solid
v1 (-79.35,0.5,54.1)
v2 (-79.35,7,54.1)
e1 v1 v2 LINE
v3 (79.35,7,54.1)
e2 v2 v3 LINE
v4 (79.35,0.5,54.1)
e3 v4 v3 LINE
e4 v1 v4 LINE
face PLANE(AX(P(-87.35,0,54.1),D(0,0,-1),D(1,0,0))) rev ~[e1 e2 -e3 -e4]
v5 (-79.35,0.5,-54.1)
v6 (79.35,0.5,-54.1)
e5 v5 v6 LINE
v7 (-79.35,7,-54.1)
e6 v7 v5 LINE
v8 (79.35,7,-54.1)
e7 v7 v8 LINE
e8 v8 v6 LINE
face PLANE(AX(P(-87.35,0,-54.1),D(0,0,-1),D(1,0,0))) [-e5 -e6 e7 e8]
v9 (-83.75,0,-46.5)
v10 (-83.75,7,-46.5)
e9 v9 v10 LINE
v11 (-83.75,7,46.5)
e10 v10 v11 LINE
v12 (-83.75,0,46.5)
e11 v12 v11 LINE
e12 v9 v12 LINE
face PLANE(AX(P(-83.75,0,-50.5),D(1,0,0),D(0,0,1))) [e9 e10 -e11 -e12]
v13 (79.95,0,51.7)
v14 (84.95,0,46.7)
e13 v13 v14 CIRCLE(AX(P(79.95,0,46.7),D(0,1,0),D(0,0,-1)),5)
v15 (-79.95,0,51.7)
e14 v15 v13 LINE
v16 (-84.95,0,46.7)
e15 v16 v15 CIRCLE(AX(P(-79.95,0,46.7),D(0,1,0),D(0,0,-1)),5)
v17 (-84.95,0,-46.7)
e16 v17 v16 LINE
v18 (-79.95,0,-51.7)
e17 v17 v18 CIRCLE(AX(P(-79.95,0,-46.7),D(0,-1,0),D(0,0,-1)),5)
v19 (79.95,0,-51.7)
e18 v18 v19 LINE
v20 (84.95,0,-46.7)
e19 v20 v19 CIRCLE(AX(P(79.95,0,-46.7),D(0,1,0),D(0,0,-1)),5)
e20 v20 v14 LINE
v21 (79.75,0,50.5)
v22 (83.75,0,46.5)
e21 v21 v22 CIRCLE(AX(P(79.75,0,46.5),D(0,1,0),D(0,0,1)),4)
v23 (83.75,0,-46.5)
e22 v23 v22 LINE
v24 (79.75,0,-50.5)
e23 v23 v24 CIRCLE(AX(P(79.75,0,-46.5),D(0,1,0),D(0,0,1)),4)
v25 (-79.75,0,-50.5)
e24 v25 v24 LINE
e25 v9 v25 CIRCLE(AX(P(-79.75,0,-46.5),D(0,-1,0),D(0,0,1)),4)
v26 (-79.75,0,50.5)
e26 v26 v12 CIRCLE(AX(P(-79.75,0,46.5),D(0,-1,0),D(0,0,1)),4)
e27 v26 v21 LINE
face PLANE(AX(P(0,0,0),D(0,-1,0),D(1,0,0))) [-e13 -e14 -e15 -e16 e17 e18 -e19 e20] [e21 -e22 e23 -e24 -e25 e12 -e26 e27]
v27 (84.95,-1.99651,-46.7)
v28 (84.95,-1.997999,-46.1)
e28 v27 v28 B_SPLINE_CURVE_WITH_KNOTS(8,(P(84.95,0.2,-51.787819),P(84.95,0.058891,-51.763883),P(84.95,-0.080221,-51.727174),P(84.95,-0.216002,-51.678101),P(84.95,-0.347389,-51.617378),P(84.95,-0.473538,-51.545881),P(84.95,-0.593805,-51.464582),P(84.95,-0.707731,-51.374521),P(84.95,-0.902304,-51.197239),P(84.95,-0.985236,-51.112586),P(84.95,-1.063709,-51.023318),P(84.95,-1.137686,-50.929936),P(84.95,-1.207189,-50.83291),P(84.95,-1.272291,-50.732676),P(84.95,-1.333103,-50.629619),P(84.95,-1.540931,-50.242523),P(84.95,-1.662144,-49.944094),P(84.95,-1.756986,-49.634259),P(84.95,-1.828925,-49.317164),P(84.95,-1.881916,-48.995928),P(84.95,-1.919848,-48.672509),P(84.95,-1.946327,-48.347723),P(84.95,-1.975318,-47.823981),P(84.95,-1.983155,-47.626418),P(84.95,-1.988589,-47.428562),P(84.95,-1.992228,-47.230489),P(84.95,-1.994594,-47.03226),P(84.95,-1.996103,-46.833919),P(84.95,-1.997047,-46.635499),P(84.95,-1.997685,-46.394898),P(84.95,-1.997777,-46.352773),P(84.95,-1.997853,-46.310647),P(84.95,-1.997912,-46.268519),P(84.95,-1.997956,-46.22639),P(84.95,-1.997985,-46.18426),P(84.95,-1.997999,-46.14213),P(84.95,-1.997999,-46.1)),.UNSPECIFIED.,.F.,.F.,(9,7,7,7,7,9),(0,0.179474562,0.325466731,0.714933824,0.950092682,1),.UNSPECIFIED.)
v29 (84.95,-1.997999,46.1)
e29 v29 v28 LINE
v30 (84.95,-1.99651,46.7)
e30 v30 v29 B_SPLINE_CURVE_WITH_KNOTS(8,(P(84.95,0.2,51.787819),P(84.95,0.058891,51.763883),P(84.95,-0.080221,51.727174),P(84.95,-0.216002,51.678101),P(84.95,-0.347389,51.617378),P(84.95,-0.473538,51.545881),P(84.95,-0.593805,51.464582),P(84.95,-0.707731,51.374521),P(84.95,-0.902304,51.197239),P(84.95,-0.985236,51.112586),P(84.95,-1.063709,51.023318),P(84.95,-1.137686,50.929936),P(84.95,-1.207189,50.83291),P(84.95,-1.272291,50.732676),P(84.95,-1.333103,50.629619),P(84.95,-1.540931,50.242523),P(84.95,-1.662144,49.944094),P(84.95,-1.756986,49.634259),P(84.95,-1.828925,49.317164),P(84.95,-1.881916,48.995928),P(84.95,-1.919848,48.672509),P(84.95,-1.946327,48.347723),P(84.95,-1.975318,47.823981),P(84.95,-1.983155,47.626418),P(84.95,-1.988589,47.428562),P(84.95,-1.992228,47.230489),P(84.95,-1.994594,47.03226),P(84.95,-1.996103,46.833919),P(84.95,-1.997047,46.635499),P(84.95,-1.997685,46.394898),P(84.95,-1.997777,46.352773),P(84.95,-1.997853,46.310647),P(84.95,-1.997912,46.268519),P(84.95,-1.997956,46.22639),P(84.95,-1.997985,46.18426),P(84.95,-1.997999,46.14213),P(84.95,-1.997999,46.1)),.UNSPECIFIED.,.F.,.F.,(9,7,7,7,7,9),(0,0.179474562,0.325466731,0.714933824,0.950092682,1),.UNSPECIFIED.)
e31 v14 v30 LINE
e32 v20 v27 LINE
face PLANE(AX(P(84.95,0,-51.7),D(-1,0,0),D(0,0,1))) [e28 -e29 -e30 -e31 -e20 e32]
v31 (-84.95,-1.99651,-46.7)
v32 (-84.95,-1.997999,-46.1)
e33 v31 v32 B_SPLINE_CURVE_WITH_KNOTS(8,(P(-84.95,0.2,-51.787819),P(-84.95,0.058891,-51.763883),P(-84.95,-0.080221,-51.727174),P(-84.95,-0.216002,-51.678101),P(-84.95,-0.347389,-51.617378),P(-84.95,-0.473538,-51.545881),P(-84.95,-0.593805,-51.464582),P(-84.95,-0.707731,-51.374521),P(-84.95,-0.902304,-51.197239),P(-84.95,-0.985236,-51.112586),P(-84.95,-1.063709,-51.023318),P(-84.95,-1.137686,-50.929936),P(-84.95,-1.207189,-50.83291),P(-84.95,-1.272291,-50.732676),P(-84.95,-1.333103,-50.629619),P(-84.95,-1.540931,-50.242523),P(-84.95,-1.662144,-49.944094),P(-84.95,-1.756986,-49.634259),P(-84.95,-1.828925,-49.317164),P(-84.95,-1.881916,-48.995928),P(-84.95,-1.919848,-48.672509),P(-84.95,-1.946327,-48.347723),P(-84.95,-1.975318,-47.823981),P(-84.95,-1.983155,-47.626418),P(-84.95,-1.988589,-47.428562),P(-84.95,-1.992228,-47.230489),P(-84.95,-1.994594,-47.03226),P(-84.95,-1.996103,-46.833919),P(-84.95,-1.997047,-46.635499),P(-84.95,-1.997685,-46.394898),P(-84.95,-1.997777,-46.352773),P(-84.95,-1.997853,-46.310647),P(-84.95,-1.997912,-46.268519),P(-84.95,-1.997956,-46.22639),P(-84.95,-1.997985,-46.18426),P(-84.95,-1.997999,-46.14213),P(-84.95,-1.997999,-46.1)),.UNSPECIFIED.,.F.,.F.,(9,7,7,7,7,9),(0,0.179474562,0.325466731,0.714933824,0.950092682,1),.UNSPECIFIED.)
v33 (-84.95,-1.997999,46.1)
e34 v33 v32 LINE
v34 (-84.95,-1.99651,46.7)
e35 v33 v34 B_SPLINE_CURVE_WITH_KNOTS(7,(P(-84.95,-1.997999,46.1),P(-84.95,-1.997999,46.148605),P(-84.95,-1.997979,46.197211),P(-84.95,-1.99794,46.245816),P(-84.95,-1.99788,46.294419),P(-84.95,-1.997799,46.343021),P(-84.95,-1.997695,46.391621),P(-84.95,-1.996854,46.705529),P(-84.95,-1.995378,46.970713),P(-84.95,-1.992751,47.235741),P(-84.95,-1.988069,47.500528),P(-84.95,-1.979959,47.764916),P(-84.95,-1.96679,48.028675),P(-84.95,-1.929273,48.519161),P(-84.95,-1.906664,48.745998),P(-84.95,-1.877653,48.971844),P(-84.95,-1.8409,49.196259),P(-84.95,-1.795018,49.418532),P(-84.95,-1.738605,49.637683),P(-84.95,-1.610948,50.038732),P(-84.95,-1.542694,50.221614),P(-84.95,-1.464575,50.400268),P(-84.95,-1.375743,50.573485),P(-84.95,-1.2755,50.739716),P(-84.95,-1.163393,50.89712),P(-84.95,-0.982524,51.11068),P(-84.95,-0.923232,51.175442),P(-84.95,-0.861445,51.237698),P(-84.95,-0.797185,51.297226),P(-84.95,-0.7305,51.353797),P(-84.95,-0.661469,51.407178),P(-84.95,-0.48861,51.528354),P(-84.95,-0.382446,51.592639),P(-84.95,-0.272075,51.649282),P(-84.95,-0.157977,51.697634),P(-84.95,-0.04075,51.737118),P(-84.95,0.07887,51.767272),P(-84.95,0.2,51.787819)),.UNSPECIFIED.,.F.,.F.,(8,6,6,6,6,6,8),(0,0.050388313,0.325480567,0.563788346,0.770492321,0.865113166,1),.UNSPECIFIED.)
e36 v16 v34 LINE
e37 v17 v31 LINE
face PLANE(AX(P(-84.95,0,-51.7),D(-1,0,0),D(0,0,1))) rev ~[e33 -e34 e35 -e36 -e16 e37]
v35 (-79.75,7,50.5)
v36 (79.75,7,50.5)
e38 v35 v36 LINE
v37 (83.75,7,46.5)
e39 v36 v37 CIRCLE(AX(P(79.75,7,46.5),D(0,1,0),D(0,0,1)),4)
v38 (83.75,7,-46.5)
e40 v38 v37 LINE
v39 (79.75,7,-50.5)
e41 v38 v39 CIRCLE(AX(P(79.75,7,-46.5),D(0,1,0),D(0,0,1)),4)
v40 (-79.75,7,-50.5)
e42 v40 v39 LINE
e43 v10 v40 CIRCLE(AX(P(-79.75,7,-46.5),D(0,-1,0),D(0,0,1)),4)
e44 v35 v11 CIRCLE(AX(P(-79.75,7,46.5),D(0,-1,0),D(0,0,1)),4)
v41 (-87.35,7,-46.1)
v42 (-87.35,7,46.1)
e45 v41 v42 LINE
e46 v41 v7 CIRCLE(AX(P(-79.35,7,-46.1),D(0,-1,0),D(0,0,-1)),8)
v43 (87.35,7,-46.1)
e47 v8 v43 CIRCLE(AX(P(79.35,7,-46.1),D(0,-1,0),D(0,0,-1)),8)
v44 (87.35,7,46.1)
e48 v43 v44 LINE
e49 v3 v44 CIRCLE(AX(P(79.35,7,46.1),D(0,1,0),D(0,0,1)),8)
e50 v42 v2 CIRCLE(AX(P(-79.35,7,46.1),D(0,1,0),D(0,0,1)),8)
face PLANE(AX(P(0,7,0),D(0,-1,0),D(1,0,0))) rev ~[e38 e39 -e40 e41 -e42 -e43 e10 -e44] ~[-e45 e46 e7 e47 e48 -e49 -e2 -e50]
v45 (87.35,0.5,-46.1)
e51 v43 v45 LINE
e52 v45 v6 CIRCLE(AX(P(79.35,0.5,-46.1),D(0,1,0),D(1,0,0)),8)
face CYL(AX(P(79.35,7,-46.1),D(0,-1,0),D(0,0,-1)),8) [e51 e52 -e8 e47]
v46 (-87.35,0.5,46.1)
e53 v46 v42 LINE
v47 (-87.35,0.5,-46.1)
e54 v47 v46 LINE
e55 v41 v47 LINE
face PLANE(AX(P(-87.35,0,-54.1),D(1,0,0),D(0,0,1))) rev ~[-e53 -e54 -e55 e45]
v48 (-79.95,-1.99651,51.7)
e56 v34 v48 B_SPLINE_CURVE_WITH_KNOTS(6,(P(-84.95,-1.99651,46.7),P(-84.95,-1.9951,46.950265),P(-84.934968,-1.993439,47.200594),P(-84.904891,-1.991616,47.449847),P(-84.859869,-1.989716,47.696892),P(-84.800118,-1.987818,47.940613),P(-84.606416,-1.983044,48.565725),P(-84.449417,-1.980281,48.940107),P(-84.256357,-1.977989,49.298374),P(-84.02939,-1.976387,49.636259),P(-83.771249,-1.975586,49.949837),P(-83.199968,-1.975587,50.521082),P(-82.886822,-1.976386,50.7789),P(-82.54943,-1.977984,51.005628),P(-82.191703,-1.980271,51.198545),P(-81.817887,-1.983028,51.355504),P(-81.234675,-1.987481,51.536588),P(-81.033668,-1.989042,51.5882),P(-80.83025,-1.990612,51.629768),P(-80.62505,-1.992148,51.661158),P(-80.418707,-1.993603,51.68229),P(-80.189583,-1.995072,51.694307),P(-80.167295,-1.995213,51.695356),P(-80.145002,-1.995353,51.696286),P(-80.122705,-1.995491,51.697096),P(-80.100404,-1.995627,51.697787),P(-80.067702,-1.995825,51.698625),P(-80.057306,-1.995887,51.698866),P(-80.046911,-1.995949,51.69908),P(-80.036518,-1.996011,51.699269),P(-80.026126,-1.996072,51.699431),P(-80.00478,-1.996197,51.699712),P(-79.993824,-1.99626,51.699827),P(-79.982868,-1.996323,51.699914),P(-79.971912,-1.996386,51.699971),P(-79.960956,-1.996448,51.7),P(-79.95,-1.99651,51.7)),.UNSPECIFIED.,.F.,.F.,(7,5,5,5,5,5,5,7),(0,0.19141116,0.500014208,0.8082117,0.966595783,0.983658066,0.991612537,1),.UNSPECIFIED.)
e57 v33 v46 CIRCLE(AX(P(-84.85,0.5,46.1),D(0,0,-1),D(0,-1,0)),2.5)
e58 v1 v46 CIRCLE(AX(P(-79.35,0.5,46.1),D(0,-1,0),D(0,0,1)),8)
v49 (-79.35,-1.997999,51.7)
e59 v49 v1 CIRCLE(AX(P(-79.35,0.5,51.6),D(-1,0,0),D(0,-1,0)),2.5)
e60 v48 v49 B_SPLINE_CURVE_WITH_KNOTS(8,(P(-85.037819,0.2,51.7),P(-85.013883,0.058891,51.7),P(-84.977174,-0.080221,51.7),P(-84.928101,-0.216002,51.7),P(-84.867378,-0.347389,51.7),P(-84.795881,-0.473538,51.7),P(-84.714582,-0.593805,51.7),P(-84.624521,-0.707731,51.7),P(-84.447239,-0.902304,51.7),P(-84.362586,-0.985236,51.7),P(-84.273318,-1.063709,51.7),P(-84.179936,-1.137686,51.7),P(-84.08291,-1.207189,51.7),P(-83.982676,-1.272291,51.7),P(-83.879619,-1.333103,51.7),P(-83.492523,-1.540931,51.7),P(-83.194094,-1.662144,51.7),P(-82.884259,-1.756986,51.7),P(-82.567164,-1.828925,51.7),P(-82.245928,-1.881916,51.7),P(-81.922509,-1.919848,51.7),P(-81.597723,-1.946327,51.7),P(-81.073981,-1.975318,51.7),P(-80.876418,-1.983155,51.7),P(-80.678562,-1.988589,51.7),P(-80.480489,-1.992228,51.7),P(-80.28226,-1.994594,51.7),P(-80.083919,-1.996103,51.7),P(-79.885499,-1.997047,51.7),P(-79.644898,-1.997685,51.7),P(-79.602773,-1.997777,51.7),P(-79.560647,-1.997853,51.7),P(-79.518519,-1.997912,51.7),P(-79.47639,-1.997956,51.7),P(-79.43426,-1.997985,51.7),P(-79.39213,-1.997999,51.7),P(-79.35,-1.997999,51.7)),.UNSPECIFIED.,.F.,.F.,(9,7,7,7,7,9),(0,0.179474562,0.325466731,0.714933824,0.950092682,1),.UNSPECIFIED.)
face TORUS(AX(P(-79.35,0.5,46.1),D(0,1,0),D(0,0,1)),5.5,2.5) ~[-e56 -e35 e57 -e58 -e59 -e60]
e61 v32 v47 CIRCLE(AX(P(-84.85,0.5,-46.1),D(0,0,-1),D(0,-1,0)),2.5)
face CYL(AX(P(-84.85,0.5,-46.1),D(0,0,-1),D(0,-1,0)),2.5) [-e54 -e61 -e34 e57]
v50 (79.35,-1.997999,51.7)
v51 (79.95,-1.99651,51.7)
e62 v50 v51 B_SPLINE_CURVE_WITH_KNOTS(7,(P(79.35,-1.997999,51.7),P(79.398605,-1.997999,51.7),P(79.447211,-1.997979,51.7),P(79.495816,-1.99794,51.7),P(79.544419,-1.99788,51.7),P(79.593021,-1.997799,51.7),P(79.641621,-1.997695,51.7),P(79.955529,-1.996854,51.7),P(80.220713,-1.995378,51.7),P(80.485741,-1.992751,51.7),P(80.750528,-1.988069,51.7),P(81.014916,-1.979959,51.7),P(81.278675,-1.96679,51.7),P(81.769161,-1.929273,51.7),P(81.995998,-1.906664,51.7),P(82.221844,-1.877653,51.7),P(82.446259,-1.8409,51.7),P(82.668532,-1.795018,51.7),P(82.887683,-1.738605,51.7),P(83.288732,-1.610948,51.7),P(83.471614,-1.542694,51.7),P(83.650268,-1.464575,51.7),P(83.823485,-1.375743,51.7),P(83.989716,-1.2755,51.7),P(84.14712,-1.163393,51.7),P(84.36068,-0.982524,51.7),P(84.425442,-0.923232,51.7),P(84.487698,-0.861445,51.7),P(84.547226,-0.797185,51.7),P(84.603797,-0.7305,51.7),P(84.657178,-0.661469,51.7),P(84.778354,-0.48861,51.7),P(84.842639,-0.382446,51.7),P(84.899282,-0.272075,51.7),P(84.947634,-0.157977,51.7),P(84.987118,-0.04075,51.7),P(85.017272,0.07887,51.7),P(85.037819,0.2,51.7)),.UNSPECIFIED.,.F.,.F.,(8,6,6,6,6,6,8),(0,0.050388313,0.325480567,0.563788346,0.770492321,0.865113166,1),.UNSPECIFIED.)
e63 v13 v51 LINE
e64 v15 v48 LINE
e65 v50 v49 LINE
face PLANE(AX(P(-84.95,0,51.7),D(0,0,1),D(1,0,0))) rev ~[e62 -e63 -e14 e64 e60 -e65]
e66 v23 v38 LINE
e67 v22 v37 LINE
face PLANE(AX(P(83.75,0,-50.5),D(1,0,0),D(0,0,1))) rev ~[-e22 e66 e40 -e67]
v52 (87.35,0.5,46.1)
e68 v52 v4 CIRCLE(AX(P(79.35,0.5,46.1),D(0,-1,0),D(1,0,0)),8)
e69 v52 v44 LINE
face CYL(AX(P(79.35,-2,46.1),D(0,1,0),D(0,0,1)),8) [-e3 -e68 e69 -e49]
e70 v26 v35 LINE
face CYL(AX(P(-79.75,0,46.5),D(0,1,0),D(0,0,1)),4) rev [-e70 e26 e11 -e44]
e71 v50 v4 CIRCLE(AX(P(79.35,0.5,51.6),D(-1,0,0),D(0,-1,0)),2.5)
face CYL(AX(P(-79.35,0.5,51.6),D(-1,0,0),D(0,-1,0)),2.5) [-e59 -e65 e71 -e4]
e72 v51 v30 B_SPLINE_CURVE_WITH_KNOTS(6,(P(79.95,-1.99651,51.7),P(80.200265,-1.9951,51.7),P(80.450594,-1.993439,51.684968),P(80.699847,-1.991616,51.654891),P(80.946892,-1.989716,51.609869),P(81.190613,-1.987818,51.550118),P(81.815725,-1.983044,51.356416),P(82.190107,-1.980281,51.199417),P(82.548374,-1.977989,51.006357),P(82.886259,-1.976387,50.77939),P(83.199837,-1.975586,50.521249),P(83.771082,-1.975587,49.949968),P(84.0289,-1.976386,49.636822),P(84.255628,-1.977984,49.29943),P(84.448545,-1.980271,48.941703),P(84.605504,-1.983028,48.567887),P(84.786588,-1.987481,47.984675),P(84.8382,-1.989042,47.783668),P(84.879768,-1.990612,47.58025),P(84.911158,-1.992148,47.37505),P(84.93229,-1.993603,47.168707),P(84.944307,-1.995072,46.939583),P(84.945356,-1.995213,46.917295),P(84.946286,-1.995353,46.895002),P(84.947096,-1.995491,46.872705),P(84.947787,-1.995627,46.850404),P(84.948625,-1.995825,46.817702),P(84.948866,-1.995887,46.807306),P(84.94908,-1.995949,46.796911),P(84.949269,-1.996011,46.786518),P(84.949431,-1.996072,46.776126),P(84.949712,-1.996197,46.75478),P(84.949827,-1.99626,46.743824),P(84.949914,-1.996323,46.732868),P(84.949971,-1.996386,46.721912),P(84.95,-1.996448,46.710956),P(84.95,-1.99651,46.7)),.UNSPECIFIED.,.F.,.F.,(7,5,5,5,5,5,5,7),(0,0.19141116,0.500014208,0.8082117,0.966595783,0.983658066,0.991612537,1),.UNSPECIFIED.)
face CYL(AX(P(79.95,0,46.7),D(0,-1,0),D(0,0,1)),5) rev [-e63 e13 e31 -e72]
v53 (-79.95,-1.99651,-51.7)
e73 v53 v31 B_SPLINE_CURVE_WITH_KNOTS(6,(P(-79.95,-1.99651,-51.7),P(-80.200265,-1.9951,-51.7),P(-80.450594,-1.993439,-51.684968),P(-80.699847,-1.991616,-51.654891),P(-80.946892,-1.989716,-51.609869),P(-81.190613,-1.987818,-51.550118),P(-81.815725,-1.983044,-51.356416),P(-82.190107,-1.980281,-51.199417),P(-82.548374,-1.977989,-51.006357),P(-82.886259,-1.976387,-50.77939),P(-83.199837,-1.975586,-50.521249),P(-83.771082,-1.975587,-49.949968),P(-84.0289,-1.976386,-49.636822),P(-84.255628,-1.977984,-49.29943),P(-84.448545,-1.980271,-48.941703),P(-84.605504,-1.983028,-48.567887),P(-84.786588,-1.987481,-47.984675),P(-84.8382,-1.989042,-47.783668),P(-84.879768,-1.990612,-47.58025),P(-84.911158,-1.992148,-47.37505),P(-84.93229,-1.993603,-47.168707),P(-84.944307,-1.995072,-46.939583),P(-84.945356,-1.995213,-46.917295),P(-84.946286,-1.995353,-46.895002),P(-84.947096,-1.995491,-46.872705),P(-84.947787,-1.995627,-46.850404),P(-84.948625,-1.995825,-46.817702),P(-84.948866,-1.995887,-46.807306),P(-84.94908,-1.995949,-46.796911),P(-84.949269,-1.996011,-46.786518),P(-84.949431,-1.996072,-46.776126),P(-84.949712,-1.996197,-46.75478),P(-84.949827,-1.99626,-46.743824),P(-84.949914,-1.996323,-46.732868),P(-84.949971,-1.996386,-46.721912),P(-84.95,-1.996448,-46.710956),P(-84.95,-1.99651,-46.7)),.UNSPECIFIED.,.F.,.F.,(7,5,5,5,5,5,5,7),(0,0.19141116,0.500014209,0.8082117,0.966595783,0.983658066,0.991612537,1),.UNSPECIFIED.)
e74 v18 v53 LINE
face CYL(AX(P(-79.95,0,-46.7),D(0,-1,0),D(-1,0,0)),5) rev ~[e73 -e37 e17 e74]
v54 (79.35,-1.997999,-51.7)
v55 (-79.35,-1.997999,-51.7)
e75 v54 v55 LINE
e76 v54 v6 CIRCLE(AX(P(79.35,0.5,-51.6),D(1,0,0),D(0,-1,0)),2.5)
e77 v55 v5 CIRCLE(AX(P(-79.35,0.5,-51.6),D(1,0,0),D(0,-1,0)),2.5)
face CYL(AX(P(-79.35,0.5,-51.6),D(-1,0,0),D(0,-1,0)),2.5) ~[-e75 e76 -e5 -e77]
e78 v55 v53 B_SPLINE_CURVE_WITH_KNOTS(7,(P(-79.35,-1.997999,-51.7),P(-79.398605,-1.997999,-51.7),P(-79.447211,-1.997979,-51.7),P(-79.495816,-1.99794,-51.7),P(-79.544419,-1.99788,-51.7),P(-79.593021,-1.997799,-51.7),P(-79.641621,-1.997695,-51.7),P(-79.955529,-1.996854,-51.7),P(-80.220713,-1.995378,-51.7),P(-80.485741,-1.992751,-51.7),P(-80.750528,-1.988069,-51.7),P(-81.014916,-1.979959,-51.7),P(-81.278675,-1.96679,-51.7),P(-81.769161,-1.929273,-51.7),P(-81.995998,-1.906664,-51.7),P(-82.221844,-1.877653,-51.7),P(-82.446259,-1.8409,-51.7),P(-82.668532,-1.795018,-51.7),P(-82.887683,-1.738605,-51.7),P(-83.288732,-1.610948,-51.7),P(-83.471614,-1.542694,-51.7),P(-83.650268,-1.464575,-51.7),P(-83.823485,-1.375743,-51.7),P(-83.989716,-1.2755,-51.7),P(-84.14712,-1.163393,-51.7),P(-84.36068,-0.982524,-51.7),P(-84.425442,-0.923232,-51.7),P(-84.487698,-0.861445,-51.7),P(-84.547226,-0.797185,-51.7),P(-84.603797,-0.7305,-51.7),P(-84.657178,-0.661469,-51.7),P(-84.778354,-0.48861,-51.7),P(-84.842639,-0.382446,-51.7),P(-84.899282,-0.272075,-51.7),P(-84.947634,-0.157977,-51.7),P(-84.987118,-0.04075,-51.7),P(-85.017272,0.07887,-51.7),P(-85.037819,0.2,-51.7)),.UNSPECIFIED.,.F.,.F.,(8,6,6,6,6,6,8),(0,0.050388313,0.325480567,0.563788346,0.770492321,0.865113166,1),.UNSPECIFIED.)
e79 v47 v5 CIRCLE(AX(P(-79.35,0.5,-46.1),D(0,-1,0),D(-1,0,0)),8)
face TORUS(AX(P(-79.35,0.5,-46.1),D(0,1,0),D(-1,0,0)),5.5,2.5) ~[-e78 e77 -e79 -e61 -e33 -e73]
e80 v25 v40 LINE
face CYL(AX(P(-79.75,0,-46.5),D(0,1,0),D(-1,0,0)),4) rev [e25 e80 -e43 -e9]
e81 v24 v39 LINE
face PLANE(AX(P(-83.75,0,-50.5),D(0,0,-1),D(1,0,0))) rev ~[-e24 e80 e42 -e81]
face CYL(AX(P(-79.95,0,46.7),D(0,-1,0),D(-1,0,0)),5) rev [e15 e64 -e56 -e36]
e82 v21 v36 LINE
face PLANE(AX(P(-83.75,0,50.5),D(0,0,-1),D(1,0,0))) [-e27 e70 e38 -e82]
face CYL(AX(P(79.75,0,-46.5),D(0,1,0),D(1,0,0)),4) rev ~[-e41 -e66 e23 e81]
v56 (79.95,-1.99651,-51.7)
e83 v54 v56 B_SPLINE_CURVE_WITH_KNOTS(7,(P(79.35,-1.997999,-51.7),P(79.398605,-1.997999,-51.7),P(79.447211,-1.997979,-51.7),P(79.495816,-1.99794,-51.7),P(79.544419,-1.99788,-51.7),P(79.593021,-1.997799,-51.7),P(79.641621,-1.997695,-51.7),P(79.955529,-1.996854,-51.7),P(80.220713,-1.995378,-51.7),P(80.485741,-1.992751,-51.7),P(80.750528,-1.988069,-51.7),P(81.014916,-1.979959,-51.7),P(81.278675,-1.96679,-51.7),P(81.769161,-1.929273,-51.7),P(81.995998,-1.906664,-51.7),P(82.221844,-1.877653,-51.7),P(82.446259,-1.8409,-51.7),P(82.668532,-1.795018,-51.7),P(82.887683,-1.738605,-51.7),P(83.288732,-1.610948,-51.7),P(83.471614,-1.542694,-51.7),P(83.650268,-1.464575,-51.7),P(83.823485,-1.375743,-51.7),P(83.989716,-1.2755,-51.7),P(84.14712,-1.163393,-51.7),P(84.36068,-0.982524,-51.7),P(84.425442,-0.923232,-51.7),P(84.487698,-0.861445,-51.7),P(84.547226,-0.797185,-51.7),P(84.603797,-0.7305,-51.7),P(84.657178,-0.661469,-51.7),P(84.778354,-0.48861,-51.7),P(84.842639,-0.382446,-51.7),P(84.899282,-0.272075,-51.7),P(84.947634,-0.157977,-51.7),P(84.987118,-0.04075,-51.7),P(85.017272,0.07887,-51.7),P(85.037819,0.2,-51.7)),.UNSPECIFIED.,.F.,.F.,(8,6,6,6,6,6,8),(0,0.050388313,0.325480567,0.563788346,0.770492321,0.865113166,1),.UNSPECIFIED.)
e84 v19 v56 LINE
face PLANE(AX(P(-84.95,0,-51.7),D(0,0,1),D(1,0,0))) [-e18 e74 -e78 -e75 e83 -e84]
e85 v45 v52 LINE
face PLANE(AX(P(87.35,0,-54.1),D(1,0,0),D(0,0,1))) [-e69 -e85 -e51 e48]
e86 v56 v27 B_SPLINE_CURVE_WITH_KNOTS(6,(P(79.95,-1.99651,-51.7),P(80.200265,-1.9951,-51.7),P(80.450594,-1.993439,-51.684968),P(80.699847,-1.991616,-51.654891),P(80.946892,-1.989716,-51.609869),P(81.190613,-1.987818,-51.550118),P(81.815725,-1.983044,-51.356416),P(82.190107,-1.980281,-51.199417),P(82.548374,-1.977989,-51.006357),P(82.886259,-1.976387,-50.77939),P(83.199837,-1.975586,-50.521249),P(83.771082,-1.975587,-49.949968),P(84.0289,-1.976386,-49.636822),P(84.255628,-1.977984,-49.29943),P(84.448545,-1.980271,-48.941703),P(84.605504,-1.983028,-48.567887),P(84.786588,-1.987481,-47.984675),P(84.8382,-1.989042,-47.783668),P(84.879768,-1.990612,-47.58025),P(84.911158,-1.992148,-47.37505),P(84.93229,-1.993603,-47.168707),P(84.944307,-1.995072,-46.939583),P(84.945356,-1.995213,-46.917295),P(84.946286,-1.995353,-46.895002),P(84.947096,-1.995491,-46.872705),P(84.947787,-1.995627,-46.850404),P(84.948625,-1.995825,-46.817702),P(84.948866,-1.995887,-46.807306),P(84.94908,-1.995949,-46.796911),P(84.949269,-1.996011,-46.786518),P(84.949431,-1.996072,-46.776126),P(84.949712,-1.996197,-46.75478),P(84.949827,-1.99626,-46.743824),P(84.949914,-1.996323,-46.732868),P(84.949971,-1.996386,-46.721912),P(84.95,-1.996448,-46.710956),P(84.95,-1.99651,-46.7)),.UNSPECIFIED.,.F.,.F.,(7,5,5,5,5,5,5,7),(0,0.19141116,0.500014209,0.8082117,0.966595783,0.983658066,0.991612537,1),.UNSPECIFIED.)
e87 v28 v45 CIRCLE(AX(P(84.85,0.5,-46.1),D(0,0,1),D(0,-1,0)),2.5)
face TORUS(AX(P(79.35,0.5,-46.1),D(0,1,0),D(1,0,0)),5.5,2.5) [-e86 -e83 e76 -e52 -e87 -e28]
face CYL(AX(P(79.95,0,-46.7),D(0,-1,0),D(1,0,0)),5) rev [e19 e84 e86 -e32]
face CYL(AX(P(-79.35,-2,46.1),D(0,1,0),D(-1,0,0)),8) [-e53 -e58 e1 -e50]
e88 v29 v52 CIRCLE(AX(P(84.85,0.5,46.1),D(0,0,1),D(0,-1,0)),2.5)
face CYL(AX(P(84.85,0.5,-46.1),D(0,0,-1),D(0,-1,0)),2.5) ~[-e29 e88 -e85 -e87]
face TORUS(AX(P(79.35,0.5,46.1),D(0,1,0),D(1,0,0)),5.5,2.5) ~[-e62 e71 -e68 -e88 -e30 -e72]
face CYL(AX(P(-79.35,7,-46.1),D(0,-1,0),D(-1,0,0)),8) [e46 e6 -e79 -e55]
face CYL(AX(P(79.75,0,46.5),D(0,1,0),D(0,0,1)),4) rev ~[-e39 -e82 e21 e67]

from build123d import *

# Parameters (mm, degrees)
F0_W         = 174.7
F0_H         = 108.2
F0_W_2       = 169.9
F0_H_2       = 103.4
F1_DEPTH     = 2
F0_W_3       = 167.5
F0_H_3       = 101
F2_DEPTH     = 7
F3_R         = 4
F4_R         = 5
F5_R         = 8
F6_T1_DEPTH  = 158.7
F6_T3_DEPTH  = 92.2
F6_T6_ANGLE  = 90
F6_T8_ANGLE  = 90
F6_T10_ANGLE = 90
F6_T12_ANGLE = 90


# Not quite as in the source:
# - a fillet or chamfer that OpenCascade refuses, or shapes differently, is made with other operations: its cross-section is extruded or revolved along the edge and cut away or added


with BuildPart() as f1:
    # F0 (on Front) → F1 (new body)
    with BuildSketch(Plane.XZ):
        Rectangle(F0_W, F0_H)
        Rectangle(F0_W_2, F0_H_2, mode=Mode.SUBTRACT)
    extrude(amount=F1_DEPTH)

    # F0 (on Front) → F2 (join)
    with BuildSketch(Plane.XZ):
        Rectangle(F0_W, F0_H)
        Rectangle(F0_W_2, F0_H_2, mode=Mode.SUBTRACT)
        Rectangle(F0_W_2, F0_H_2)
        Rectangle(F0_W_3, F0_H_3, mode=Mode.SUBTRACT)
    extrude(amount=-F2_DEPTH)

    # F3
    f3_edges = [f1.edges().sort_by_distance(p)[0] for p in [
        (83.75, 3.5, 50.5),
        (-83.75, 3.5, 50.5),
        (-83.75, 3.5, -50.5),
        (83.75, 3.5, -50.5),
    ]]
    fillet(f3_edges, radius=F3_R)

    # F4
    f4_edges = [f1.edges().sort_by_distance(p)[0] for p in [
        (84.95, -1, 51.7),
        (84.95, -1, -51.7),
        (-84.95, -1, -51.7),
        (-84.95, -1, 51.7),
    ]]
    fillet(f4_edges, radius=F4_R)

    # F5
    f5_edges = [f1.edges().sort_by_distance(p)[0] for p in [
        (87.35, 2.5, -54.1),
        (-87.35, 2.5, -54.1),
        (-87.35, 2.5, 54.1),
        (87.35, 2.5, 54.1),
    ]]
    fillet(f5_edges, radius=F5_R)

    # F6: fillet of radius 2.5 on 1 edges, made by hand

    # F6_s2 → F6_t1 (cut)
    with BuildSketch(Plane.YZ.offset(-79.35)):
        with BuildLine():
            ThreePointArc((-2, 51.6), (-1.267766953, 53.367766953), (0.5, 54.1))
            Line((0.5, 54.1), (-2, 54.1))
            Line((-2, 54.1), (-2, 51.6))
        make_face()
        with BuildLine():
            ThreePointArc((-2, -51.6), (-1.267766953, -53.367766953), (0.5, -54.1))
            Line((0.5, -54.1), (-2, -54.1))
            Line((-2, -54.1), (-2, -51.6))
        make_face()
    extrude(amount=F6_T1_DEPTH, mode=Mode.SUBTRACT)

    # F6_s4 → F6_t3 (cut)
    with BuildSketch(Plane.XY.offset(-46.1)):
        with BuildLine():
            ThreePointArc((-84.85, -2), (-86.617766953, -1.267766953), (-87.35, 0.5))
            Line((-87.35, 0.5), (-87.35, -2))
            Line((-87.35, -2), (-84.85, -2))
        make_face()
        with BuildLine():
            ThreePointArc((84.85, -2), (86.617766953, -1.267766953), (87.35, 0.5))
            Line((87.35, 0.5), (87.35, -2))
            Line((87.35, -2), (84.85, -2))
        make_face()
    extrude(amount=F6_T3_DEPTH, mode=Mode.SUBTRACT)

    # F6_s5 → F6_t6 (revolve, cut)
    with BuildSketch(Plane.YZ.offset(-79.35)):
        with BuildLine():
            ThreePointArc((-2, 51.6), (-1.267766953, 53.367766953), (0.5, 54.1))
            Line((0.5, 54.1), (-2, 54.1))
            Line((-2, 54.1), (-2, 51.6))
        make_face()
    revolve(axis=Axis((-79.35, -2, 46.1), (0, -1, 0)), revolution_arc=F6_T6_ANGLE, mode=Mode.SUBTRACT)

    # F6_s7 → F6_t8 (revolve, cut)
    with BuildSketch(Plane.XY.offset(-46.1)):
        with BuildLine():
            ThreePointArc((-84.85, -2), (-86.617766953, -1.267766953), (-87.35, 0.5))
            Line((-87.35, 0.5), (-87.35, -2))
            Line((-87.35, -2), (-84.85, -2))
        make_face()
    revolve(axis=Axis((-79.35, -2, -46.1), (0, -1, 0)), revolution_arc=F6_T8_ANGLE, mode=Mode.SUBTRACT)

    # F6_s9 → F6_t10 (revolve, cut)
    with BuildSketch(Plane.XY.offset(-46.1)):
        with BuildLine():
            ThreePointArc((84.85, -2), (86.617766953, -1.267766953), (87.35, 0.5))
            Line((87.35, 0.5), (87.35, -2))
            Line((87.35, -2), (84.85, -2))
        make_face()
    revolve(axis=Axis((79.35, -2, -46.1), (0, 1, 0)), revolution_arc=F6_T10_ANGLE, mode=Mode.SUBTRACT)

    # F6_s11 → F6_t12 (revolve, cut)
    with BuildSketch(Plane.XY.offset(46.1)):
        with BuildLine():
            ThreePointArc((84.85, -2), (86.617766953, -1.267766953), (87.35, 0.5))
            Line((87.35, 0.5), (87.35, -2))
            Line((87.35, -2), (84.85, -2))
        make_face()
    revolve(axis=Axis((79.35, -2, 46.1), (0, -1, 0)), revolution_arc=F6_T12_ANGLE, mode=Mode.SUBTRACT)


solid = f1.part
